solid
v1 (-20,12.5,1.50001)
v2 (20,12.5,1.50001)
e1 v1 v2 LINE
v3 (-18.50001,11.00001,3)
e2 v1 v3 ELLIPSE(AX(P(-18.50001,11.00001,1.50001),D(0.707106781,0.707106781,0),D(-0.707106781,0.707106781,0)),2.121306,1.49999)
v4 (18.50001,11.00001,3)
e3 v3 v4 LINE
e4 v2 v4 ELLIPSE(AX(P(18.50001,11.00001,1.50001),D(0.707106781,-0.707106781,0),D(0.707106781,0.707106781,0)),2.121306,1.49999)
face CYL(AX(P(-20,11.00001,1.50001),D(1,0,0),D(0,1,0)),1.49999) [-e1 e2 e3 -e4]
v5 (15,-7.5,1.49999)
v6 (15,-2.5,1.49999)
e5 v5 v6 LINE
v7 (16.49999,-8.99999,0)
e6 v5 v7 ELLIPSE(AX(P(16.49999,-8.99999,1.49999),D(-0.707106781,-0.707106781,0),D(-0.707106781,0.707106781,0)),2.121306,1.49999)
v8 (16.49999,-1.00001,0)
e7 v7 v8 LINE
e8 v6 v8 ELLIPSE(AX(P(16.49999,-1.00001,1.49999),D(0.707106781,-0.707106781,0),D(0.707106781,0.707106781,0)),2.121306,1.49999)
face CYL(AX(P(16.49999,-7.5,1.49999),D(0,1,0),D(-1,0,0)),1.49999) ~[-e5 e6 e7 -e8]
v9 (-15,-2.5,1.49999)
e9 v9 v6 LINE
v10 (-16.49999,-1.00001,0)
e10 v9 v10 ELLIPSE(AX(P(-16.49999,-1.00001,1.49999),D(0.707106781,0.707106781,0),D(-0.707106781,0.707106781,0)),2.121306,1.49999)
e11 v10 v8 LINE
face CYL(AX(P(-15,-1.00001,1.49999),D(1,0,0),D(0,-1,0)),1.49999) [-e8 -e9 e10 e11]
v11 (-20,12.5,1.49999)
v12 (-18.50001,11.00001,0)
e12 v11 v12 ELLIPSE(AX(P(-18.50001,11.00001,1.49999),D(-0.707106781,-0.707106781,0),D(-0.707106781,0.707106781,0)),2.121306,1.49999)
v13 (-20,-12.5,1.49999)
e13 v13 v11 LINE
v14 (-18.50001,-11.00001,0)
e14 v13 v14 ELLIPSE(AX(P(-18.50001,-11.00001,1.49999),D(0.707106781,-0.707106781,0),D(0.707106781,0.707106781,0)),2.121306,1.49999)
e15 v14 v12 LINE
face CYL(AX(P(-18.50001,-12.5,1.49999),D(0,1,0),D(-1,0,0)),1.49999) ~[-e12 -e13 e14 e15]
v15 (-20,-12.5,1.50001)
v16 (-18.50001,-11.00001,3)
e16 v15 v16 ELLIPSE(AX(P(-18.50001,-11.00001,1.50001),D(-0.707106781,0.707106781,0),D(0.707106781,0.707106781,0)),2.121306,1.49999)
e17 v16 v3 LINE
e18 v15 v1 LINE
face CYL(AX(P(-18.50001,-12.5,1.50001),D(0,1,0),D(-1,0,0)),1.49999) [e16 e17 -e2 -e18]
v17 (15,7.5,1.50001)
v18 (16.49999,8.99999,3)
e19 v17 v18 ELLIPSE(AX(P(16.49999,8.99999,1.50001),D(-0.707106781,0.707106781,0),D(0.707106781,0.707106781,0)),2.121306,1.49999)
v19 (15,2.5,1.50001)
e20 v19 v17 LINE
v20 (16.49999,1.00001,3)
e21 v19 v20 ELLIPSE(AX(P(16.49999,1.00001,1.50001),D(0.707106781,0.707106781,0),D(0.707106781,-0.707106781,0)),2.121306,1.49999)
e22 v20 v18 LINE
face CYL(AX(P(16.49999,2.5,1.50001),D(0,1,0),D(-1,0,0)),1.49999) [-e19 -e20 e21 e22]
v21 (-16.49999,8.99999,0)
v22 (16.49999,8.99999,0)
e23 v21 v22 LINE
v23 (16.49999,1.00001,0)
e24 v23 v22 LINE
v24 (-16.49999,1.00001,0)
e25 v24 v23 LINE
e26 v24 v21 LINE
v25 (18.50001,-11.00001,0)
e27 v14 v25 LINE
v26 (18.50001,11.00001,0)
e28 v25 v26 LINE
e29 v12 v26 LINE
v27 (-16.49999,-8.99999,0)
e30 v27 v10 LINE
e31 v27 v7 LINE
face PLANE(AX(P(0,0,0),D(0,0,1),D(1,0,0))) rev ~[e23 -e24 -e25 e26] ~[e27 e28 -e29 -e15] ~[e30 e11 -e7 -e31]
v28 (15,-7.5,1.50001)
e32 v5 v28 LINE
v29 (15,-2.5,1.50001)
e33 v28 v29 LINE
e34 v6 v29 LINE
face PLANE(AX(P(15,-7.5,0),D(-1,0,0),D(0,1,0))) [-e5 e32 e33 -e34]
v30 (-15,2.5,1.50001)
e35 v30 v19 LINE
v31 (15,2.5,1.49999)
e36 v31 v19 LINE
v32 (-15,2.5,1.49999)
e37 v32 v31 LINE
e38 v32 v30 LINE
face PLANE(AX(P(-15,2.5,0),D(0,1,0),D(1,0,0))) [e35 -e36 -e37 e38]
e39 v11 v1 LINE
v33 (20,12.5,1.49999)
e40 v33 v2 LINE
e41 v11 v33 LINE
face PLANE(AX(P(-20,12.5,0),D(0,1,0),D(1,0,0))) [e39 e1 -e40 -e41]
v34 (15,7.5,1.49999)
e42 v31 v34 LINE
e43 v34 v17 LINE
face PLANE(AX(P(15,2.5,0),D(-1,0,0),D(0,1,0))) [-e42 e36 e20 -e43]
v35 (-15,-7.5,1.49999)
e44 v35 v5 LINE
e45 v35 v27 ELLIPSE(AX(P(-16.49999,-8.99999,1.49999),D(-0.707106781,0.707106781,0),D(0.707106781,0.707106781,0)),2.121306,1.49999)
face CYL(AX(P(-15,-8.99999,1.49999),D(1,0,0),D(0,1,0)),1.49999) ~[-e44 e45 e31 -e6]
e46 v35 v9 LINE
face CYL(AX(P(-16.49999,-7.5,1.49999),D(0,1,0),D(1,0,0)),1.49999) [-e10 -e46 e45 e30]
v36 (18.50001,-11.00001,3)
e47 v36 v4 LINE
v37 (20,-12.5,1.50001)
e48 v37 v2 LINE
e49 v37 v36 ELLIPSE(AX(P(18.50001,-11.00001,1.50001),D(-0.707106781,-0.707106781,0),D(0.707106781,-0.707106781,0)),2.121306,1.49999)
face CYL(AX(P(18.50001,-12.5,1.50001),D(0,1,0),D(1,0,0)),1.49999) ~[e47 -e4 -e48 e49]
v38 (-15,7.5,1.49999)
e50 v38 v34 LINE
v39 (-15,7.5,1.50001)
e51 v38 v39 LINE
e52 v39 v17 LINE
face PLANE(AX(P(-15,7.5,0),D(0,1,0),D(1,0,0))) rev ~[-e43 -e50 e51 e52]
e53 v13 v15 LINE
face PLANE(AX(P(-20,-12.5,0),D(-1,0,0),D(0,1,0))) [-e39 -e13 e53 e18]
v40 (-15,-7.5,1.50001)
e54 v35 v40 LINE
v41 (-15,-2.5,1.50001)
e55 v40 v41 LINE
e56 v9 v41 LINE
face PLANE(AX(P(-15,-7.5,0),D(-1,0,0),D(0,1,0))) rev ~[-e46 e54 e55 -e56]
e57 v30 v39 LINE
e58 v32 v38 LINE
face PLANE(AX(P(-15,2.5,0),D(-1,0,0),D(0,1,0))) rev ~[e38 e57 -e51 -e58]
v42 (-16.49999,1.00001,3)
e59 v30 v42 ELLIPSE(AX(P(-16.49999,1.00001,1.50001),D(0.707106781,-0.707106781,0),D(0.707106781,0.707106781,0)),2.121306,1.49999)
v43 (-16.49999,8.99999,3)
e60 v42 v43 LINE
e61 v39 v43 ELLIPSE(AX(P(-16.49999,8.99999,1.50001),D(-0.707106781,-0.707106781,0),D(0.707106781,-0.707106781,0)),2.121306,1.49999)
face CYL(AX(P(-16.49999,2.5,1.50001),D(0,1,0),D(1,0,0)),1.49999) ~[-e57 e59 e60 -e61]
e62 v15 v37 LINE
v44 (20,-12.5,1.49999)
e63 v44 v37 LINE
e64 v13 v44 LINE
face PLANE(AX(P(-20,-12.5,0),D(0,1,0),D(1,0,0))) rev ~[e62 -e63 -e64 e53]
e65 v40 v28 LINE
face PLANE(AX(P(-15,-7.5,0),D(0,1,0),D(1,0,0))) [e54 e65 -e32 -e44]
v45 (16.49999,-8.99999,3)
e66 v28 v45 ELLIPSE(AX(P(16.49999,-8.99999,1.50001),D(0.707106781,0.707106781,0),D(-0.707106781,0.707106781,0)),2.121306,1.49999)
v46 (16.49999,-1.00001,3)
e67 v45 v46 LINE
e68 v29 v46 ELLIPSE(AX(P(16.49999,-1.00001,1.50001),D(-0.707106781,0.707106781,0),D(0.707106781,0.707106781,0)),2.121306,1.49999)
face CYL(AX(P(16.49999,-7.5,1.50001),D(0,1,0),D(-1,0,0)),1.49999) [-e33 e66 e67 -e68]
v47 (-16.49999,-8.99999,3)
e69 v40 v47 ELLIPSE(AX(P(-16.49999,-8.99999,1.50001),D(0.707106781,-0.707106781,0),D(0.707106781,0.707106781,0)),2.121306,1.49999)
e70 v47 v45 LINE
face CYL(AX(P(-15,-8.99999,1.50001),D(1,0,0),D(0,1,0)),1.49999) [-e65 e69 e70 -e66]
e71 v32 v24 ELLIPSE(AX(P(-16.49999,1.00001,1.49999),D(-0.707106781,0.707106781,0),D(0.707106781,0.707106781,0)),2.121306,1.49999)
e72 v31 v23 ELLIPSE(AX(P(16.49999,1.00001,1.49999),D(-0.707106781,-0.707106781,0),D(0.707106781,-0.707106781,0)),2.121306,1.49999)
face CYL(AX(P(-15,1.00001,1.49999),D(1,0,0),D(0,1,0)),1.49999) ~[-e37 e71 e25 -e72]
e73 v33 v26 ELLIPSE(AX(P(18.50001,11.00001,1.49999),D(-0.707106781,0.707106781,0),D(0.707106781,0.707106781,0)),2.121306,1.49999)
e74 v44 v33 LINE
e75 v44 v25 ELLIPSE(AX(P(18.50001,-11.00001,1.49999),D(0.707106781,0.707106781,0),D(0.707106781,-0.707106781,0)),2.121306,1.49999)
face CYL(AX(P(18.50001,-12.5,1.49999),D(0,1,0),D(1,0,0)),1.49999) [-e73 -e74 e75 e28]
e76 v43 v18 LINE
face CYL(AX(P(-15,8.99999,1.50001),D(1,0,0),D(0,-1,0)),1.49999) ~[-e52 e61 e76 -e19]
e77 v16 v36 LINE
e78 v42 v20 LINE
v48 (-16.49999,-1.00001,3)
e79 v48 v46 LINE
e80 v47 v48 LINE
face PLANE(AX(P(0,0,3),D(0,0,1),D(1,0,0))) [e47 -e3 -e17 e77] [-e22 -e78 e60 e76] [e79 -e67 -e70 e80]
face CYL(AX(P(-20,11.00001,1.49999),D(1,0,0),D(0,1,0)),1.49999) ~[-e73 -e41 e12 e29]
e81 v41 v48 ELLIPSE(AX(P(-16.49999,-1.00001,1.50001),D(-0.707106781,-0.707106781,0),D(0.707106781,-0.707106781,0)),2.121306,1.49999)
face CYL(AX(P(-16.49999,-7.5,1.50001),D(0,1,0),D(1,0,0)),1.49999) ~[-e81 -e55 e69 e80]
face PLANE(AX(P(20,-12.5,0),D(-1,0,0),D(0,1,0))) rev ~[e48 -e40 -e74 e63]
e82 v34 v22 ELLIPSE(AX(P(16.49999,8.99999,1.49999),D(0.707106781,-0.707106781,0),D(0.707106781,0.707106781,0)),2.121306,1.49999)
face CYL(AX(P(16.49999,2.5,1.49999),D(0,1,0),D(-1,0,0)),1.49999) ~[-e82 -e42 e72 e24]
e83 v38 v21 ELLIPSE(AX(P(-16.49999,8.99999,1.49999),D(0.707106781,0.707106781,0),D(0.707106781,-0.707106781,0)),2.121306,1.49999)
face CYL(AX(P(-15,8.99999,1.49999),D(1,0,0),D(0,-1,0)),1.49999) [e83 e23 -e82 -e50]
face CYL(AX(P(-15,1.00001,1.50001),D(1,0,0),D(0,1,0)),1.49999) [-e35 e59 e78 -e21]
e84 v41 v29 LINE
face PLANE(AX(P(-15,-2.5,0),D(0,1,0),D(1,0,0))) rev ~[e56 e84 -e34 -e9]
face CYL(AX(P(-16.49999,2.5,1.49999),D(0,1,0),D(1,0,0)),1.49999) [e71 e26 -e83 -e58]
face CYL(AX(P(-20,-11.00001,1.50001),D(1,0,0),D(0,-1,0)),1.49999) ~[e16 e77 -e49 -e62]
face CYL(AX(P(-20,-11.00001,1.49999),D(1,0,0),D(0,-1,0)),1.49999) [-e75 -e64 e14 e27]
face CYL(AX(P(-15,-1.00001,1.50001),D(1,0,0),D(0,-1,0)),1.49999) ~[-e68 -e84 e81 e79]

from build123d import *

# Parameters (mm, degrees)
F0_W     = 40
F0_H     = 25
F0_W_2   = 30
F0_H_2   = 5
F1_DEPTH = 3
F2_R     = 1.49999


# Not quite as in the source:
# - a fillet or chamfer is up to 0.001 mm smaller than in the source, because OpenCascade refuses the exact size


with BuildPart() as f1:
    # F0 (on Top) → F1 (new body)
    with BuildSketch(Plane.XY):
        Rectangle(F0_W, F0_H)
        with Locations((0, -5)):
            Rectangle(F0_W_2, F0_H_2, mode=Mode.SUBTRACT)
        with Locations((0, 5)):
            Rectangle(F0_W_2, F0_H_2, mode=Mode.SUBTRACT)
    extrude(amount=F1_DEPTH)

    # F2 (radius 1.5 in the source; OpenCascade refuses exactly that, so slightly less here)
    f2_edges = [f1.edges().sort_by_distance(p)[0] for p in [
        (0, -12.5, 3),
        (-20, 0, 3),
        (0, 12.5, 3),
        (20, 0, 3),
        (0, -12.5, 0),
        (20, 0, 0),
        (-20, 0, 0),
        (0, 12.5, 0),
        (0, 2.5, 3),
        (0, 7.5, 3),
        (15, 5, 3),
        (15, -5, 3),
        (0, -7.5, 3),
        (0, -2.5, 3),
        (-15, -5, 3),
        (-15, 5, 3),
        (0, 2.5, 0),
        (15, 5, 0),
        (0, 7.5, 0),
        (-15, 5, 0),
        (-15, -5, 0),
        (0, -2.5, 0),
        (15, -5, 0),
        (0, -7.5, 0),
    ]]
    fillet(f2_edges, radius=F2_R)


solid = f1.part
